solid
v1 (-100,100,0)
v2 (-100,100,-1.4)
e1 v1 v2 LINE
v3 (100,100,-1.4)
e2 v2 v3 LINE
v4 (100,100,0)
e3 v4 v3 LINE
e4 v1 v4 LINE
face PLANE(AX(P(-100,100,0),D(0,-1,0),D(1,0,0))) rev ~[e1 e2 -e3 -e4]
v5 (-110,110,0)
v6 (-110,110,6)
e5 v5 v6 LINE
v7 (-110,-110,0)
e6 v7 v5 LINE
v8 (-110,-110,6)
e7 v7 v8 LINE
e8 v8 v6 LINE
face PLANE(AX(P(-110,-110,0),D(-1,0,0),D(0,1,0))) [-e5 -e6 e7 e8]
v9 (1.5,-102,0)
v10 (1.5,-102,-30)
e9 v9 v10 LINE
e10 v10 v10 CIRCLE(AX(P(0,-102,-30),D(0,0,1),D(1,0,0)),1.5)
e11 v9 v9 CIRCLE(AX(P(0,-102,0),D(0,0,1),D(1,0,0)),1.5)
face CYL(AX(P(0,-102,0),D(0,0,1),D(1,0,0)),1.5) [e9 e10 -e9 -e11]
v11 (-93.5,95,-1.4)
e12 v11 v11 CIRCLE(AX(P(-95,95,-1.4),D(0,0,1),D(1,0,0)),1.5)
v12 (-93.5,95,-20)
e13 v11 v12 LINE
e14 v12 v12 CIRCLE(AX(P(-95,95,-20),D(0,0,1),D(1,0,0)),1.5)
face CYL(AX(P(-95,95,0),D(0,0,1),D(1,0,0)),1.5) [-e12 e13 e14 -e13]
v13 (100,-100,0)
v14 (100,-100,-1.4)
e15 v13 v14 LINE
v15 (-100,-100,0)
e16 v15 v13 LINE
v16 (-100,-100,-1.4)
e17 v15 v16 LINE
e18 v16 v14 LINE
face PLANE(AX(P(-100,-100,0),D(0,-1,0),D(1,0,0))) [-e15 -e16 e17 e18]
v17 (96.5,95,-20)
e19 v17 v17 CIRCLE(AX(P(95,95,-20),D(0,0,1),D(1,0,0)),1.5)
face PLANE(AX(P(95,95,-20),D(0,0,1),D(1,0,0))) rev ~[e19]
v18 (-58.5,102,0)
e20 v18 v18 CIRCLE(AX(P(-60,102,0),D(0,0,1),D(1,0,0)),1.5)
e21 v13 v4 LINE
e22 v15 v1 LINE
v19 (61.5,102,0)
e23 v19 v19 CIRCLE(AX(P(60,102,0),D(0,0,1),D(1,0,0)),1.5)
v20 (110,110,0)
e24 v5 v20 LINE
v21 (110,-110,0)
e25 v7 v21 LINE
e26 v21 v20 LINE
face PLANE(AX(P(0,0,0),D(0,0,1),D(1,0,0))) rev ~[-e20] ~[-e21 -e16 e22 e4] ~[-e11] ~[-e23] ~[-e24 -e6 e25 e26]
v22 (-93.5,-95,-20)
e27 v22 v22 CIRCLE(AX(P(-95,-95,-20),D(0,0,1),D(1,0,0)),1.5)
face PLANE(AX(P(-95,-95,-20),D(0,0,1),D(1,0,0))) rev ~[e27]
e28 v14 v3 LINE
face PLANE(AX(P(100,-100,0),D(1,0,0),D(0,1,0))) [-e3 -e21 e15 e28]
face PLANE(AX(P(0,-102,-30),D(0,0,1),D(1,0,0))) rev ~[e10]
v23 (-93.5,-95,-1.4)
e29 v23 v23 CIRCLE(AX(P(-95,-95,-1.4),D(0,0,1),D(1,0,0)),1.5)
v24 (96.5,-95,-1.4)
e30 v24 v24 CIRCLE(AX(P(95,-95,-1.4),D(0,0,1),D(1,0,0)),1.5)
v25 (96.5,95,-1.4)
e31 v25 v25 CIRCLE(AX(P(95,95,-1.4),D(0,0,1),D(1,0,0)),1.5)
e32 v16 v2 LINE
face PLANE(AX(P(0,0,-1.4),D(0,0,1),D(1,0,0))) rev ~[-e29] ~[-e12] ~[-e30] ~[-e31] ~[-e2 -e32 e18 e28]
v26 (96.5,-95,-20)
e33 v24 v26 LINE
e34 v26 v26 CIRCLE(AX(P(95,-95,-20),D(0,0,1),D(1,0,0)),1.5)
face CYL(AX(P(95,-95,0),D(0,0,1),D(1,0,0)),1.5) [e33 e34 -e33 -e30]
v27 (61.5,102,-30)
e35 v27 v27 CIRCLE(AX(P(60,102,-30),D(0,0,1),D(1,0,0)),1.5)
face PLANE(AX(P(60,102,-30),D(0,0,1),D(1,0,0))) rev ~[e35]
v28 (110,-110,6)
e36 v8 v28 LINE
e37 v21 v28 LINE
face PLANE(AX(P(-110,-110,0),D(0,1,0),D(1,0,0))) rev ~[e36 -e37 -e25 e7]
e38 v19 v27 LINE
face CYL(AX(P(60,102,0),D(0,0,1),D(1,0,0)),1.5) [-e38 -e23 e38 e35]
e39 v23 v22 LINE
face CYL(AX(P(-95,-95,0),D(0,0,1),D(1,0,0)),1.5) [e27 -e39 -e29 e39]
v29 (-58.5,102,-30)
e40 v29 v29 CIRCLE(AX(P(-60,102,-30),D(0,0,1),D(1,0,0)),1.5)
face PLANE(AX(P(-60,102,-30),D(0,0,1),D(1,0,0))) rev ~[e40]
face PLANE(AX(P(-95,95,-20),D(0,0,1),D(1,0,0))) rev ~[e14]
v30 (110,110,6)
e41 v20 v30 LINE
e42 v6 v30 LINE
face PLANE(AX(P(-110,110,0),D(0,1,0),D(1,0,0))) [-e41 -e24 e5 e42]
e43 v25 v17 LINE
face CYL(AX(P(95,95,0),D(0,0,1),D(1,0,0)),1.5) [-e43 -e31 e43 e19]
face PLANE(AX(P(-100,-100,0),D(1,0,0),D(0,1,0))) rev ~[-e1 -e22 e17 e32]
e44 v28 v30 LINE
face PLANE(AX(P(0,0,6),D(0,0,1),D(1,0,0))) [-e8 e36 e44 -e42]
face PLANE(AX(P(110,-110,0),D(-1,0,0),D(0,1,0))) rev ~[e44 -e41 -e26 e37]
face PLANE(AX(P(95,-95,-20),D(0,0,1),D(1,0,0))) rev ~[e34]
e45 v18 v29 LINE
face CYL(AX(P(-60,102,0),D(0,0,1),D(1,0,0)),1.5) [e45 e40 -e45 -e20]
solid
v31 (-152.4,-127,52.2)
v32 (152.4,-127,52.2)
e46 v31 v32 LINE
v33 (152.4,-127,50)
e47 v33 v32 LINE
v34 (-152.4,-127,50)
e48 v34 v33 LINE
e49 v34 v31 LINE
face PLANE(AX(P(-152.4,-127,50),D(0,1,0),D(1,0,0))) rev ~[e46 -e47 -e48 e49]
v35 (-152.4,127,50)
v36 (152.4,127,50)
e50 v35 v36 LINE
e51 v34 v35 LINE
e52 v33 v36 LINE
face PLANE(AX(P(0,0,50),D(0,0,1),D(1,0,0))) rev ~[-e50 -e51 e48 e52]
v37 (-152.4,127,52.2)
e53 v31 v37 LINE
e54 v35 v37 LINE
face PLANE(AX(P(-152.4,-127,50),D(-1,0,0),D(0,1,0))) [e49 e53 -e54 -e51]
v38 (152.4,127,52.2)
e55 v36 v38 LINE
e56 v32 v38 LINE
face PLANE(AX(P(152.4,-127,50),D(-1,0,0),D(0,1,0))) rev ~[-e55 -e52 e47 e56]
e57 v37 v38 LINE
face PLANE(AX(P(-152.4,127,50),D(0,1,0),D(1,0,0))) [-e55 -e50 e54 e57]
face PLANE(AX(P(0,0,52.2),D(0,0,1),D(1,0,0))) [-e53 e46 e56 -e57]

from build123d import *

# Parameters (mm, degrees)
F0_W     = 220
F0_H     = 220
F0_R     = 1.5
F0_W_2   = 200
F0_H_2   = 200
F1_DEPTH = 6
F2_DEPTH = 1.4
F3_DEPTH = 20
F4_DEPTH = 30
F7_W     = 304.8
F7_H     = 254
F8_DEPTH = 2.2


with BuildPart() as f1:
    # F0 (on Top) → F1 (new body)
    with BuildSketch(Plane.XY):
        Rectangle(F0_W, F0_H)
        with Locations((0, -102)):
            Circle(F0_R, mode=Mode.SUBTRACT)
        with Locations((-60, 102)):
            Circle(F0_R, mode=Mode.SUBTRACT)
        Rectangle(F0_W_2, F0_H_2, mode=Mode.SUBTRACT)
        with Locations((60, 102)):
            Circle(F0_R, mode=Mode.SUBTRACT)
        Rectangle(F0_W_2, F0_H_2)
        with Locations((-95, -95)):
            Circle(F0_R, mode=Mode.SUBTRACT)
        with Locations((95, -95)):
            Circle(F0_R, mode=Mode.SUBTRACT)
        with Locations((-95, 95)):
            Circle(F0_R, mode=Mode.SUBTRACT)
        with Locations((95, 95)):
            Circle(F0_R, mode=Mode.SUBTRACT)
        with Locations((-95, 95)):
            Circle(F0_R)
        with Locations((-60, 102)):
            Circle(F0_R)
        with Locations((60, 102)):
            Circle(F0_R)
        with Locations((95, 95)):
            Circle(F0_R)
        with Locations((-95, -95)):
            Circle(F0_R)
        with Locations((0, -102)):
            Circle(F0_R)
        with Locations((95, -95)):
            Circle(F0_R)
    extrude(amount=F1_DEPTH)

    # F0 (on Top) → F2 (join)
    with BuildSketch(Plane.XY):
        Rectangle(F0_W_2, F0_H_2)
        with Locations((-95, -95)):
            Circle(F0_R, mode=Mode.SUBTRACT)
        with Locations((95, -95)):
            Circle(F0_R, mode=Mode.SUBTRACT)
        with Locations((-95, 95)):
            Circle(F0_R, mode=Mode.SUBTRACT)
        with Locations((95, 95)):
            Circle(F0_R, mode=Mode.SUBTRACT)
    extrude(amount=-F2_DEPTH)

    # F0 (on Top) → F3 (join)
    with BuildSketch(Plane.XY):
        with Locations((-95, -95)):
            Circle(F0_R)
        with Locations((95, -95)):
            Circle(F0_R)
        with Locations((-95, 95)):
            Circle(F0_R)
        with Locations((95, 95)):
            Circle(F0_R)
    extrude(amount=-F3_DEPTH)

    # F0 (on Top) → F4 (join)
    with BuildSketch(Plane.XY):
        with Locations((0, -102)):
            Circle(F0_R)
        with Locations((-60, 102)):
            Circle(F0_R)
        with Locations((60, 102)):
            Circle(F0_R)
    extrude(amount=-F4_DEPTH)


with BuildPart() as f8:
    # F7 (on offset) → F8 (new body)
    with BuildSketch(Plane.XY.offset(50)):
        Rectangle(F7_W, F7_H)
    extrude(amount=F8_DEPTH)


solid = Compound([f1.part, f8.part])
